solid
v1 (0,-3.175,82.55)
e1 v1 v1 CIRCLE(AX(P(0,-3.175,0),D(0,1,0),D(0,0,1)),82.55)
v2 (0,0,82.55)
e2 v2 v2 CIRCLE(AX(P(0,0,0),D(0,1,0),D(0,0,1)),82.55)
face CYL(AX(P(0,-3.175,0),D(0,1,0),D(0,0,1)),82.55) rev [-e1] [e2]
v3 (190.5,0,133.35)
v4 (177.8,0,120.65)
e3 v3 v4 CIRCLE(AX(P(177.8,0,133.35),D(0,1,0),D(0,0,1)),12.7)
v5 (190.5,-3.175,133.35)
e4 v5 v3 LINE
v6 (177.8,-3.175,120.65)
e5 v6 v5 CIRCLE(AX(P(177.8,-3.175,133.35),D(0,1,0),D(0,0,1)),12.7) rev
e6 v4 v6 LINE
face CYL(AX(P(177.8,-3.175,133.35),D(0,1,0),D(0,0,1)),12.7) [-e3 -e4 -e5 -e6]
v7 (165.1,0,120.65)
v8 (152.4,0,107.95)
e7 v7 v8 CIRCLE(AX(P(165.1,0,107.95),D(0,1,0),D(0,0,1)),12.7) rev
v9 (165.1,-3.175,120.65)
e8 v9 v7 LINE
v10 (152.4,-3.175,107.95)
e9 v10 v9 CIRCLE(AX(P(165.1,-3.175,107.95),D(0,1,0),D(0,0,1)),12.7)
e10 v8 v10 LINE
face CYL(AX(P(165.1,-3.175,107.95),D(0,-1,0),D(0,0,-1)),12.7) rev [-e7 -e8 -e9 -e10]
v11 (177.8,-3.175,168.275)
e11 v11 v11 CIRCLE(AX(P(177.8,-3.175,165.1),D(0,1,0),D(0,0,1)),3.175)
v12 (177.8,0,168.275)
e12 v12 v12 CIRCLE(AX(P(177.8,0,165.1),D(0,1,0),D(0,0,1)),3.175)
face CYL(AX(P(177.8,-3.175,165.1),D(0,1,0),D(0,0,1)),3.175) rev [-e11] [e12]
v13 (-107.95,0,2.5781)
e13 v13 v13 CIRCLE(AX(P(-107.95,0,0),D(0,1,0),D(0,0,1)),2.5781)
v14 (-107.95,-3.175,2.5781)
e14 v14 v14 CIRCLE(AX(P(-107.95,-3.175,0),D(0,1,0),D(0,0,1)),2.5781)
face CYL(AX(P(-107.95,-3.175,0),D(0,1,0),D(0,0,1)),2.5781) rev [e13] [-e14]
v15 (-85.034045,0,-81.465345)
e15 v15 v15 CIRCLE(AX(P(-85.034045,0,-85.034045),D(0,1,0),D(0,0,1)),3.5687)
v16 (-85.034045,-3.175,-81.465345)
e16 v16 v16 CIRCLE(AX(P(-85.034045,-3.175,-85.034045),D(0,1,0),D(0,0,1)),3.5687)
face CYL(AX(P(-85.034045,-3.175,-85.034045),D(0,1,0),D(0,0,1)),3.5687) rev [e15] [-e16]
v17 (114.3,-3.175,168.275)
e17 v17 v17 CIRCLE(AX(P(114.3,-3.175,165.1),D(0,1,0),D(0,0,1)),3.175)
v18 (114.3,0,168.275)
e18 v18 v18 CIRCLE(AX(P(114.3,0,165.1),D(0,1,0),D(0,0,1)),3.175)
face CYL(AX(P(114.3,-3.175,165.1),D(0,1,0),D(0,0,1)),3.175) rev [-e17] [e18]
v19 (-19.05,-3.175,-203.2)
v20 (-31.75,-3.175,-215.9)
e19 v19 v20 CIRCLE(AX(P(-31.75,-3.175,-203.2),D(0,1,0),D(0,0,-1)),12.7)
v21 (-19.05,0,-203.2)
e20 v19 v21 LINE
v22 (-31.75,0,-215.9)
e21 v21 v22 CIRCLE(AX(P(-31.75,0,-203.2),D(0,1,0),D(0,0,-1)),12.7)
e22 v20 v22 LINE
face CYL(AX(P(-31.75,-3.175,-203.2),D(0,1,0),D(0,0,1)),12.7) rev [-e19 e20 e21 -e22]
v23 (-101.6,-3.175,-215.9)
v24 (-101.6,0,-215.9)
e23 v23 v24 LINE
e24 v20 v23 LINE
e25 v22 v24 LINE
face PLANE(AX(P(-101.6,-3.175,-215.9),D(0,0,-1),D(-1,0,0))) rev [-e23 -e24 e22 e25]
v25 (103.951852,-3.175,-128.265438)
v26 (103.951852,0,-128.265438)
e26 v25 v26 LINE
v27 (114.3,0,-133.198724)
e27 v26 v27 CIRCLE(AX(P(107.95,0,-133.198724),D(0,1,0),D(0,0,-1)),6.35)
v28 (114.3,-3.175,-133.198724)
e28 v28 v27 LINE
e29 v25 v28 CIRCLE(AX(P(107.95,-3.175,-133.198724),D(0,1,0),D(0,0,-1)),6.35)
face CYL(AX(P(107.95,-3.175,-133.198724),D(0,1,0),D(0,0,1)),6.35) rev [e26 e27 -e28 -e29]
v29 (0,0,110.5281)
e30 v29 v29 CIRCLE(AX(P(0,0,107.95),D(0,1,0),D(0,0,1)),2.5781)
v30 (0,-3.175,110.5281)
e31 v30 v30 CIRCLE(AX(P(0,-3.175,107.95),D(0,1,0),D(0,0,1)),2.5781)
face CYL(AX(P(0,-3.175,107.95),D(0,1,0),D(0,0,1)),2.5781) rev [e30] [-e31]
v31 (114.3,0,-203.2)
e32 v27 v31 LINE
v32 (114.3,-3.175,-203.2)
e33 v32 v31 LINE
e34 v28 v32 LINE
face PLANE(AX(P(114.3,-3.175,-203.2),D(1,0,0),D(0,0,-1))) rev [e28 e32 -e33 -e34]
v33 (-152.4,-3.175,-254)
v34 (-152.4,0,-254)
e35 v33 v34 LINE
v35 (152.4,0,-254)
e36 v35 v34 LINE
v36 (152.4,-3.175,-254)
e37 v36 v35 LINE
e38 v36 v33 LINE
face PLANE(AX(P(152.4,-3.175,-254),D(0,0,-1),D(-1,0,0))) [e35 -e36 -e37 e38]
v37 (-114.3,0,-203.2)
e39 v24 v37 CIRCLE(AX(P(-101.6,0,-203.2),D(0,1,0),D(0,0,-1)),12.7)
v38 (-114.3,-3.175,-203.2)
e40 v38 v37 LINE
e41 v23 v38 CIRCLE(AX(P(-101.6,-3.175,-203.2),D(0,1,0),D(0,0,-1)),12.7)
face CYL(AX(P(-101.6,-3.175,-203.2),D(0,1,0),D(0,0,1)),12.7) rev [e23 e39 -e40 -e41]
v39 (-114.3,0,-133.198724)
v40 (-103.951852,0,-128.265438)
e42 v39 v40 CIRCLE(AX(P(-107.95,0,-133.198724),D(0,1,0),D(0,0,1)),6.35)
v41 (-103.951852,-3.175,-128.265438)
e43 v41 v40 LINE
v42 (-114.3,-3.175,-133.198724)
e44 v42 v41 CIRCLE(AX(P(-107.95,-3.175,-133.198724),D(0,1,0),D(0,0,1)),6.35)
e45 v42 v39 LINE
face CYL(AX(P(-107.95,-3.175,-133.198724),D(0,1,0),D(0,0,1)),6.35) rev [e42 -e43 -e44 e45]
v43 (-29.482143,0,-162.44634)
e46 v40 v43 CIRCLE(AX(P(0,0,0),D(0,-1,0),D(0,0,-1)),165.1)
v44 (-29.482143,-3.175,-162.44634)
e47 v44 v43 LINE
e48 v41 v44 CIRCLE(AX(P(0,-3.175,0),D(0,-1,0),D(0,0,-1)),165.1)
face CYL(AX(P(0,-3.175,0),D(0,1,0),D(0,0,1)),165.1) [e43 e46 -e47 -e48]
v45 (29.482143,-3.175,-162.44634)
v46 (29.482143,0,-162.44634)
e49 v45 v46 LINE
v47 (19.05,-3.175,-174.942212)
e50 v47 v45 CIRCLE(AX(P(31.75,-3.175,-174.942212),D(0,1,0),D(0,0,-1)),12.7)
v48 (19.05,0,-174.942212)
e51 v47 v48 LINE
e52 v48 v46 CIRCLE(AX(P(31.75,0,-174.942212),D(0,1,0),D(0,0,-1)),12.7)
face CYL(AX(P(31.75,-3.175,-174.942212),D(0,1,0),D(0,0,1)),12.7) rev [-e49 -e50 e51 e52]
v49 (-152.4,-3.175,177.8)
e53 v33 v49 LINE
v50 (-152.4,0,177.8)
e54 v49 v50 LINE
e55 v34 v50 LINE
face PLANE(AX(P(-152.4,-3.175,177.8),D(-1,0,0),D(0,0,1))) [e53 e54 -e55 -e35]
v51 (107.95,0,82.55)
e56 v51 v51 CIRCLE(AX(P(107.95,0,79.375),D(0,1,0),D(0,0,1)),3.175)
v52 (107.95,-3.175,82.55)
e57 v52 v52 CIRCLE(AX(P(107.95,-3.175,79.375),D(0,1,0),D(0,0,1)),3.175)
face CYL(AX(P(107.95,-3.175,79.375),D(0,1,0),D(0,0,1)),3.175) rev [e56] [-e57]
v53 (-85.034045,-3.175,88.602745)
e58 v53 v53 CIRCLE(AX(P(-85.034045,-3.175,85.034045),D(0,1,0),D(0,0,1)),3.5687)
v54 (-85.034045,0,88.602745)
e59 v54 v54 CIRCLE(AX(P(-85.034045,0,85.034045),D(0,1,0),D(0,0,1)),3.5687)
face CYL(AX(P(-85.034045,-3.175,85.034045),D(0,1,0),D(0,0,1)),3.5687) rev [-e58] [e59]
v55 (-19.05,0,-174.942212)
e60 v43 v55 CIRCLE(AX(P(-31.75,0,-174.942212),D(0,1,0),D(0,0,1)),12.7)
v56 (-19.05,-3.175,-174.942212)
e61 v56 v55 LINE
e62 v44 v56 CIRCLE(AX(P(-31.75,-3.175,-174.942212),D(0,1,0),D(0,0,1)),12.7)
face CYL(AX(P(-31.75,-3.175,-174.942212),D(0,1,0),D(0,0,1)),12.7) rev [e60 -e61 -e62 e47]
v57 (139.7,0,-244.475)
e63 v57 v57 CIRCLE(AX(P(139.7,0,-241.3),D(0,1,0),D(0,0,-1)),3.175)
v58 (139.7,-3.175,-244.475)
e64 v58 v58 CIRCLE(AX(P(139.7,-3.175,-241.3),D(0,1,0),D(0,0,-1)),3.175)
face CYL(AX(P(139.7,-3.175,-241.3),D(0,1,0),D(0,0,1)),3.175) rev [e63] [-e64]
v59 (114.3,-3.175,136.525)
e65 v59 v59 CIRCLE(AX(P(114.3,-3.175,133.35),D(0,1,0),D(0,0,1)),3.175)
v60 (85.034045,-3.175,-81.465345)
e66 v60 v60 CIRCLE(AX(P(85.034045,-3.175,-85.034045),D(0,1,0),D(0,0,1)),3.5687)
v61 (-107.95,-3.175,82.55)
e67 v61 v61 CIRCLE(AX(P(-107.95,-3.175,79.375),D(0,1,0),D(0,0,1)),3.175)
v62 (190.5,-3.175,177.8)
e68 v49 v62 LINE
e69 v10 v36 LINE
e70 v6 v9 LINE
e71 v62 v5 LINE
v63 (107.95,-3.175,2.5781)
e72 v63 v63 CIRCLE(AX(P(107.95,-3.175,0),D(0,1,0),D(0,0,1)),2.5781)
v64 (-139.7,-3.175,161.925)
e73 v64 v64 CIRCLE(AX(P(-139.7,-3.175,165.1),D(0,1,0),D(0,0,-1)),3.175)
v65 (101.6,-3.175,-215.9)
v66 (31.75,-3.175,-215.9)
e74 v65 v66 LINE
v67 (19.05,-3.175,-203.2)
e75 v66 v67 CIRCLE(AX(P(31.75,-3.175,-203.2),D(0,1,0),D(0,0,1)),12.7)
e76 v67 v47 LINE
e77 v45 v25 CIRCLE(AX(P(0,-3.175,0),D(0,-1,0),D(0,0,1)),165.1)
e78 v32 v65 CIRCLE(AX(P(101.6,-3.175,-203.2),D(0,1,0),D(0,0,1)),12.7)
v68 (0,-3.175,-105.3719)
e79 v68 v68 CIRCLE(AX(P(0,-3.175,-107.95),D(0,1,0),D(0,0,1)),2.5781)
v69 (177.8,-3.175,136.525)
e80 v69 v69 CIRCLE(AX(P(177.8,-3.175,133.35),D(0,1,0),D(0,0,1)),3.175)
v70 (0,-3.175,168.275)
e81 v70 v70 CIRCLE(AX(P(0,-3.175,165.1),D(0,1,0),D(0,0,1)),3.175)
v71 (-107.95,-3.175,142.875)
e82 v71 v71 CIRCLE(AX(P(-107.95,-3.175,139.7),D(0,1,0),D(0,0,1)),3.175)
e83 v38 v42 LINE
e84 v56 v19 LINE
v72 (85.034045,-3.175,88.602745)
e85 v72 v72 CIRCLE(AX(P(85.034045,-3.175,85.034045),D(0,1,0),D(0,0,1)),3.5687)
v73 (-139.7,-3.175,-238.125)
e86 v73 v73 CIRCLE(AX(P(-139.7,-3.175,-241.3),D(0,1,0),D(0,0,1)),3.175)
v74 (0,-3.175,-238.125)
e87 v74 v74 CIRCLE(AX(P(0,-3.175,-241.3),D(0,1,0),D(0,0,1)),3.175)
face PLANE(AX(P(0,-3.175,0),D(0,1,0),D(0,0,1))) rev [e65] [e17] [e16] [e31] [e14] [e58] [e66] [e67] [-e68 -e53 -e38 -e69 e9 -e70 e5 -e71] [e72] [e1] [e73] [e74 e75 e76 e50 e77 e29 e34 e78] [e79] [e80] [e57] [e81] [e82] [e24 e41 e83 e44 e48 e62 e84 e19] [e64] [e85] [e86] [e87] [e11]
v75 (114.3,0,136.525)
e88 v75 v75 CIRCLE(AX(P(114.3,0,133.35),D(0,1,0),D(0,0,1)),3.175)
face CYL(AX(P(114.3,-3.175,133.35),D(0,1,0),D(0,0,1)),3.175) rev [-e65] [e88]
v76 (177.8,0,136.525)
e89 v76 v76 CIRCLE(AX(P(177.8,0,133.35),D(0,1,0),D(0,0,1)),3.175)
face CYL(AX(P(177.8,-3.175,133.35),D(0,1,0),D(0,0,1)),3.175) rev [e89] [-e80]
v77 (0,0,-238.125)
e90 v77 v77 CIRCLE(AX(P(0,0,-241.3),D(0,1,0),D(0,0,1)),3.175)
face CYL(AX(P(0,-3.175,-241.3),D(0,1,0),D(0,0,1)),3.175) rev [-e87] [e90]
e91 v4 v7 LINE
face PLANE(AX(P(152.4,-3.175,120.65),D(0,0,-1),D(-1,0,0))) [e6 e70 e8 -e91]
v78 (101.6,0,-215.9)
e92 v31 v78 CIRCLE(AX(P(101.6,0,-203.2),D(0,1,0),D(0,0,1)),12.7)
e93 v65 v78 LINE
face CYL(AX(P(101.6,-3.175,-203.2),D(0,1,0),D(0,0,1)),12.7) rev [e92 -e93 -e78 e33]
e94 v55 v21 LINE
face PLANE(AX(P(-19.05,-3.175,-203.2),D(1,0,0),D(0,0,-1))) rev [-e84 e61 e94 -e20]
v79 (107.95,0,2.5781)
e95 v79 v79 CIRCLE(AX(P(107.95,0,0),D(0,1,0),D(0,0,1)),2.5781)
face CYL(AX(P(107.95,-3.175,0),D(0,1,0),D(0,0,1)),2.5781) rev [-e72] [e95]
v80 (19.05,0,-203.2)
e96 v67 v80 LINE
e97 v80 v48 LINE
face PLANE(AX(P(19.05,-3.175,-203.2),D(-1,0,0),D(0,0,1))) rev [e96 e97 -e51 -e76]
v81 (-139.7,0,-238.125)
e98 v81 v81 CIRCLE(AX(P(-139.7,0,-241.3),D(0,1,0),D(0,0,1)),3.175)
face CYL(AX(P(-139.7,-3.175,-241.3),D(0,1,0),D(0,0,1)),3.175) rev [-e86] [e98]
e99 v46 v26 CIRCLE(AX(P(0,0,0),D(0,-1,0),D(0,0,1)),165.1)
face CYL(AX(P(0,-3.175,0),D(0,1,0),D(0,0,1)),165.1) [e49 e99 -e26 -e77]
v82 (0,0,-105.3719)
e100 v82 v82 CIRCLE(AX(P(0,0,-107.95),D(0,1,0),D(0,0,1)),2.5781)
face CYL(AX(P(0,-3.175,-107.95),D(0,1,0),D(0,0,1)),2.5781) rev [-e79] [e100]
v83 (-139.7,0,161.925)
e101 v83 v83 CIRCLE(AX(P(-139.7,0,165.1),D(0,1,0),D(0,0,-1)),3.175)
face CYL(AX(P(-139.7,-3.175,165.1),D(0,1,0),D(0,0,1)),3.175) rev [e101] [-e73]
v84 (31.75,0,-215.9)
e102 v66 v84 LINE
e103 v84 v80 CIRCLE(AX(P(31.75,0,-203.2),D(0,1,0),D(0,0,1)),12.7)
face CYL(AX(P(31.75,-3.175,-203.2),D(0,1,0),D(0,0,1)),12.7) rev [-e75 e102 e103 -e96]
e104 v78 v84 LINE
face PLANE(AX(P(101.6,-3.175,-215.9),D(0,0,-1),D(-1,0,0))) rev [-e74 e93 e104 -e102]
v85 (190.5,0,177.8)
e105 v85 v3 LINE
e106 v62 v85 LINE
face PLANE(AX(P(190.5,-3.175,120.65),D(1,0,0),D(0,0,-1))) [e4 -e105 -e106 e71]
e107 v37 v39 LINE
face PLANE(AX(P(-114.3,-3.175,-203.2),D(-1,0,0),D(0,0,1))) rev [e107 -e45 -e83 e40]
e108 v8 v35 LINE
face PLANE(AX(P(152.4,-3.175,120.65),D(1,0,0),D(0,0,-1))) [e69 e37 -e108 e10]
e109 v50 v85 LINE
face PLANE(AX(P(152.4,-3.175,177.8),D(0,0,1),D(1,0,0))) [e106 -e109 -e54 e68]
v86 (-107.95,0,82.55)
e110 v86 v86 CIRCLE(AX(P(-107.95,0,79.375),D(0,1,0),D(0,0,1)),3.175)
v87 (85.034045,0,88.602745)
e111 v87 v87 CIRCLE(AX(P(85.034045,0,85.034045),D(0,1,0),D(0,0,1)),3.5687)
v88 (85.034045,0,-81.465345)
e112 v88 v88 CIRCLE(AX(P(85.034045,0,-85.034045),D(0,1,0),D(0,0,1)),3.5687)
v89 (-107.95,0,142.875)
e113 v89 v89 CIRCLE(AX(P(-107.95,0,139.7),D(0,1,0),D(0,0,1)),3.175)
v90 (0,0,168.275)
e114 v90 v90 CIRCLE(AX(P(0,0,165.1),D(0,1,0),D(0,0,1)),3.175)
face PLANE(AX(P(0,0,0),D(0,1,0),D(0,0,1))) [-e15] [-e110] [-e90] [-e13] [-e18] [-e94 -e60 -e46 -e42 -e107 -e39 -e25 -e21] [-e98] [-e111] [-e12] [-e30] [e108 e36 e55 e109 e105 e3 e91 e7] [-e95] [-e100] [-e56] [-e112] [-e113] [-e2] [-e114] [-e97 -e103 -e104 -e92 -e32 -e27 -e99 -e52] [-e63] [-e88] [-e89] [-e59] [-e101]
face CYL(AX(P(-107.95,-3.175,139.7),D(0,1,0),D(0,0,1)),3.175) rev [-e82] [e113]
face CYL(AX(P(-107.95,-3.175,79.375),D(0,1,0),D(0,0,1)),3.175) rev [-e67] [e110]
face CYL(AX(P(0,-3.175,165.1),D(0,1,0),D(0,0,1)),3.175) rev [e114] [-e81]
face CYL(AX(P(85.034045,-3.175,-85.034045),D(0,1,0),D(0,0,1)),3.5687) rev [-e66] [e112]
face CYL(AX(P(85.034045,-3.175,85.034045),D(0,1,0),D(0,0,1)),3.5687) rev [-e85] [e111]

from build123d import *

# Parameters (mm, degrees)
BASE_FLANGE1_DEPTH = 3.175
SKETCH2_R          = 2.5781
SKETCH2_R_2        = 3.5687
SKETCH2_R_3        = 3.175
CUT_EXTRUDE1_DEPTH = 318.515874603
FILLET1_R          = 12.7
SKETCH3_R          = 82.55
CUT_EXTRUDE2_DEPTH = 318.515874603


# Sheet-metal steps are written as plain solids
with BuildPart() as part:
    # Sketch1 → Base-Flange1 (new body)
    with BuildSketch(Plane(origin=(0, 0, 0), x_dir=(1, 0, 0), z_dir=(0, 1, 0))):
        Polygon((152.4, -177.8), (-152.4, -177.8), (-152.4, 254), (152.4, 254), (152.4, -120.65), (190.5, -120.65), (190.5, -177.8), align=None)
    extrude(amount=-BASE_FLANGE1_DEPTH)

    # Sketch2 → Cut-Extrude1 (cut, through all)
    with BuildSketch(Plane(origin=(0, 0, 0), x_dir=(1, 0, 0), z_dir=(0, 1, 0))):
        with Locations(Location((-107.95, 0, 0), (0, 0, 270))):
            Circle(SKETCH2_R)
        with Locations(Location((0, 107.95, 0), (0, 0, 270))):
            Circle(SKETCH2_R)
        with Locations(Location((107.95, 0, 0), (0, 0, 270))):
            Circle(SKETCH2_R)
        with Locations(Location((85.03404521, 85.03404521, 0), (0, 0, 270))):
            Circle(SKETCH2_R_2)
        with Locations(Location((85.03404521, -85.03404521, 0), (0, 0, 270))):
            Circle(SKETCH2_R_2)
        with Locations(Location((0, -107.95, 0), (0, 0, 270))):
            Circle(SKETCH2_R)
        with Locations(Location((-85.03404521, -85.03404521, 0), (0, 0, 270))):
            Circle(SKETCH2_R_2)
        with Locations(Location((-85.03404521, 85.03404521, 0), (0, 0, 270))):
            Circle(SKETCH2_R_2)
        with Locations(Location((0, 241.3, 0), (0, 0, 270))):
            Circle(SKETCH2_R_3)
        with Locations(Location((-139.7, 241.3, 0), (0, 0, 270))):
            Circle(SKETCH2_R_3)
        with Locations(Location((0, -165.1, 0), (0, 0, 270))):
            Circle(SKETCH2_R_3)
        with Locations(Location((-139.7, -165.1, 0), (0, 0, 90))):
            Circle(SKETCH2_R_3)
        with Locations(Location((139.7, 241.3, 0), (0, 0, 90))):
            Circle(SKETCH2_R_3)
        with Locations(Location((177.8, -165.1, 0), (0, 0, 270))):
            Circle(SKETCH2_R_3)
        with Locations(Location((177.8, -133.35, 0), (0, 0, 270))):
            Circle(SKETCH2_R_3)
        with Locations(Location((114.3, -165.1, 0), (0, 0, 270))):
            Circle(SKETCH2_R_3)
        with Locations(Location((107.95, -79.375, 0), (0, 0, 270))):
            Circle(SKETCH2_R_3)
        with Locations(Location((114.3, -133.35, 0), (0, 0, 270))):
            Circle(SKETCH2_R_3)
        with Locations(Location((-107.95, -79.375, 0), (0, 0, 270))):
            Circle(SKETCH2_R_3)
        with Locations(Location((-107.95, -139.7, 0), (0, 0, 270))):
            Circle(SKETCH2_R_3)
    extrude(amount=-CUT_EXTRUDE1_DEPTH, mode=Mode.SUBTRACT)

    # Fillet1
    fillet1_edges = [part.edges().sort_by_distance(p)[0] for p in [
        (152.4, -1.5875, 120.65),
        (190.5, -1.5875, 120.65),
    ]]
    fillet(fillet1_edges, radius=FILLET1_R)

    # Sketch3 → Cut-Extrude2 (cut, through all)
    with BuildSketch(Plane(origin=(0, 0, 0), x_dir=(1, 0, 0), z_dir=(0, 1, 0))):
        with Locations(Location((0, 0, 0), (0, 0, 270))):
            Circle(SKETCH3_R)
        with BuildLine():
            Line((114.3, 203.2), (114.3, 133.198723718))
            ThreePointArc((114.3, 133.198723718), (110.682604916, 127.466763288), (103.951851852, 128.265437654))
            ThreePointArc((103.951851852, 128.265437654), (68.871193184, 150.049221089), (29.482142857, 162.44633961))
            ThreePointArc((29.482142857, 162.44633961), (22.000851686, 166.803163593), (19.05, 174.942211887))
            Line((19.05, 174.942211887), (19.05, 203.2))
            ThreePointArc((19.05, 203.2), (22.769743879, 212.180256121), (31.75, 215.9))
            Line((31.75, 215.9), (101.6, 215.9))
            ThreePointArc((101.6, 215.9), (110.580256121, 212.180256121), (114.3, 203.2))
        make_face()
        with BuildLine():
            Line((-101.6, 215.9), (-31.75, 215.9))
            ThreePointArc((-31.75, 215.9), (-22.769743879, 212.180256121), (-19.05, 203.2))
            Line((-19.05, 203.2), (-19.05, 174.942211887))
            ThreePointArc((-19.05, 174.942211887), (-22.000851686, 166.803163593), (-29.482142857, 162.44633961))
            ThreePointArc((-29.482142857, 162.44633961), (-68.871193184, 150.049221089), (-103.951851852, 128.265437654))
            ThreePointArc((-103.951851852, 128.265437654), (-110.682604916, 127.466763288), (-114.3, 133.198723718))
            Line((-114.3, 133.198723718), (-114.3, 203.2))
            ThreePointArc((-114.3, 203.2), (-110.580256121, 212.180256121), (-101.6, 215.9))
        make_face()
    extrude(amount=-CUT_EXTRUDE2_DEPTH, mode=Mode.SUBTRACT)


solid = part.part
